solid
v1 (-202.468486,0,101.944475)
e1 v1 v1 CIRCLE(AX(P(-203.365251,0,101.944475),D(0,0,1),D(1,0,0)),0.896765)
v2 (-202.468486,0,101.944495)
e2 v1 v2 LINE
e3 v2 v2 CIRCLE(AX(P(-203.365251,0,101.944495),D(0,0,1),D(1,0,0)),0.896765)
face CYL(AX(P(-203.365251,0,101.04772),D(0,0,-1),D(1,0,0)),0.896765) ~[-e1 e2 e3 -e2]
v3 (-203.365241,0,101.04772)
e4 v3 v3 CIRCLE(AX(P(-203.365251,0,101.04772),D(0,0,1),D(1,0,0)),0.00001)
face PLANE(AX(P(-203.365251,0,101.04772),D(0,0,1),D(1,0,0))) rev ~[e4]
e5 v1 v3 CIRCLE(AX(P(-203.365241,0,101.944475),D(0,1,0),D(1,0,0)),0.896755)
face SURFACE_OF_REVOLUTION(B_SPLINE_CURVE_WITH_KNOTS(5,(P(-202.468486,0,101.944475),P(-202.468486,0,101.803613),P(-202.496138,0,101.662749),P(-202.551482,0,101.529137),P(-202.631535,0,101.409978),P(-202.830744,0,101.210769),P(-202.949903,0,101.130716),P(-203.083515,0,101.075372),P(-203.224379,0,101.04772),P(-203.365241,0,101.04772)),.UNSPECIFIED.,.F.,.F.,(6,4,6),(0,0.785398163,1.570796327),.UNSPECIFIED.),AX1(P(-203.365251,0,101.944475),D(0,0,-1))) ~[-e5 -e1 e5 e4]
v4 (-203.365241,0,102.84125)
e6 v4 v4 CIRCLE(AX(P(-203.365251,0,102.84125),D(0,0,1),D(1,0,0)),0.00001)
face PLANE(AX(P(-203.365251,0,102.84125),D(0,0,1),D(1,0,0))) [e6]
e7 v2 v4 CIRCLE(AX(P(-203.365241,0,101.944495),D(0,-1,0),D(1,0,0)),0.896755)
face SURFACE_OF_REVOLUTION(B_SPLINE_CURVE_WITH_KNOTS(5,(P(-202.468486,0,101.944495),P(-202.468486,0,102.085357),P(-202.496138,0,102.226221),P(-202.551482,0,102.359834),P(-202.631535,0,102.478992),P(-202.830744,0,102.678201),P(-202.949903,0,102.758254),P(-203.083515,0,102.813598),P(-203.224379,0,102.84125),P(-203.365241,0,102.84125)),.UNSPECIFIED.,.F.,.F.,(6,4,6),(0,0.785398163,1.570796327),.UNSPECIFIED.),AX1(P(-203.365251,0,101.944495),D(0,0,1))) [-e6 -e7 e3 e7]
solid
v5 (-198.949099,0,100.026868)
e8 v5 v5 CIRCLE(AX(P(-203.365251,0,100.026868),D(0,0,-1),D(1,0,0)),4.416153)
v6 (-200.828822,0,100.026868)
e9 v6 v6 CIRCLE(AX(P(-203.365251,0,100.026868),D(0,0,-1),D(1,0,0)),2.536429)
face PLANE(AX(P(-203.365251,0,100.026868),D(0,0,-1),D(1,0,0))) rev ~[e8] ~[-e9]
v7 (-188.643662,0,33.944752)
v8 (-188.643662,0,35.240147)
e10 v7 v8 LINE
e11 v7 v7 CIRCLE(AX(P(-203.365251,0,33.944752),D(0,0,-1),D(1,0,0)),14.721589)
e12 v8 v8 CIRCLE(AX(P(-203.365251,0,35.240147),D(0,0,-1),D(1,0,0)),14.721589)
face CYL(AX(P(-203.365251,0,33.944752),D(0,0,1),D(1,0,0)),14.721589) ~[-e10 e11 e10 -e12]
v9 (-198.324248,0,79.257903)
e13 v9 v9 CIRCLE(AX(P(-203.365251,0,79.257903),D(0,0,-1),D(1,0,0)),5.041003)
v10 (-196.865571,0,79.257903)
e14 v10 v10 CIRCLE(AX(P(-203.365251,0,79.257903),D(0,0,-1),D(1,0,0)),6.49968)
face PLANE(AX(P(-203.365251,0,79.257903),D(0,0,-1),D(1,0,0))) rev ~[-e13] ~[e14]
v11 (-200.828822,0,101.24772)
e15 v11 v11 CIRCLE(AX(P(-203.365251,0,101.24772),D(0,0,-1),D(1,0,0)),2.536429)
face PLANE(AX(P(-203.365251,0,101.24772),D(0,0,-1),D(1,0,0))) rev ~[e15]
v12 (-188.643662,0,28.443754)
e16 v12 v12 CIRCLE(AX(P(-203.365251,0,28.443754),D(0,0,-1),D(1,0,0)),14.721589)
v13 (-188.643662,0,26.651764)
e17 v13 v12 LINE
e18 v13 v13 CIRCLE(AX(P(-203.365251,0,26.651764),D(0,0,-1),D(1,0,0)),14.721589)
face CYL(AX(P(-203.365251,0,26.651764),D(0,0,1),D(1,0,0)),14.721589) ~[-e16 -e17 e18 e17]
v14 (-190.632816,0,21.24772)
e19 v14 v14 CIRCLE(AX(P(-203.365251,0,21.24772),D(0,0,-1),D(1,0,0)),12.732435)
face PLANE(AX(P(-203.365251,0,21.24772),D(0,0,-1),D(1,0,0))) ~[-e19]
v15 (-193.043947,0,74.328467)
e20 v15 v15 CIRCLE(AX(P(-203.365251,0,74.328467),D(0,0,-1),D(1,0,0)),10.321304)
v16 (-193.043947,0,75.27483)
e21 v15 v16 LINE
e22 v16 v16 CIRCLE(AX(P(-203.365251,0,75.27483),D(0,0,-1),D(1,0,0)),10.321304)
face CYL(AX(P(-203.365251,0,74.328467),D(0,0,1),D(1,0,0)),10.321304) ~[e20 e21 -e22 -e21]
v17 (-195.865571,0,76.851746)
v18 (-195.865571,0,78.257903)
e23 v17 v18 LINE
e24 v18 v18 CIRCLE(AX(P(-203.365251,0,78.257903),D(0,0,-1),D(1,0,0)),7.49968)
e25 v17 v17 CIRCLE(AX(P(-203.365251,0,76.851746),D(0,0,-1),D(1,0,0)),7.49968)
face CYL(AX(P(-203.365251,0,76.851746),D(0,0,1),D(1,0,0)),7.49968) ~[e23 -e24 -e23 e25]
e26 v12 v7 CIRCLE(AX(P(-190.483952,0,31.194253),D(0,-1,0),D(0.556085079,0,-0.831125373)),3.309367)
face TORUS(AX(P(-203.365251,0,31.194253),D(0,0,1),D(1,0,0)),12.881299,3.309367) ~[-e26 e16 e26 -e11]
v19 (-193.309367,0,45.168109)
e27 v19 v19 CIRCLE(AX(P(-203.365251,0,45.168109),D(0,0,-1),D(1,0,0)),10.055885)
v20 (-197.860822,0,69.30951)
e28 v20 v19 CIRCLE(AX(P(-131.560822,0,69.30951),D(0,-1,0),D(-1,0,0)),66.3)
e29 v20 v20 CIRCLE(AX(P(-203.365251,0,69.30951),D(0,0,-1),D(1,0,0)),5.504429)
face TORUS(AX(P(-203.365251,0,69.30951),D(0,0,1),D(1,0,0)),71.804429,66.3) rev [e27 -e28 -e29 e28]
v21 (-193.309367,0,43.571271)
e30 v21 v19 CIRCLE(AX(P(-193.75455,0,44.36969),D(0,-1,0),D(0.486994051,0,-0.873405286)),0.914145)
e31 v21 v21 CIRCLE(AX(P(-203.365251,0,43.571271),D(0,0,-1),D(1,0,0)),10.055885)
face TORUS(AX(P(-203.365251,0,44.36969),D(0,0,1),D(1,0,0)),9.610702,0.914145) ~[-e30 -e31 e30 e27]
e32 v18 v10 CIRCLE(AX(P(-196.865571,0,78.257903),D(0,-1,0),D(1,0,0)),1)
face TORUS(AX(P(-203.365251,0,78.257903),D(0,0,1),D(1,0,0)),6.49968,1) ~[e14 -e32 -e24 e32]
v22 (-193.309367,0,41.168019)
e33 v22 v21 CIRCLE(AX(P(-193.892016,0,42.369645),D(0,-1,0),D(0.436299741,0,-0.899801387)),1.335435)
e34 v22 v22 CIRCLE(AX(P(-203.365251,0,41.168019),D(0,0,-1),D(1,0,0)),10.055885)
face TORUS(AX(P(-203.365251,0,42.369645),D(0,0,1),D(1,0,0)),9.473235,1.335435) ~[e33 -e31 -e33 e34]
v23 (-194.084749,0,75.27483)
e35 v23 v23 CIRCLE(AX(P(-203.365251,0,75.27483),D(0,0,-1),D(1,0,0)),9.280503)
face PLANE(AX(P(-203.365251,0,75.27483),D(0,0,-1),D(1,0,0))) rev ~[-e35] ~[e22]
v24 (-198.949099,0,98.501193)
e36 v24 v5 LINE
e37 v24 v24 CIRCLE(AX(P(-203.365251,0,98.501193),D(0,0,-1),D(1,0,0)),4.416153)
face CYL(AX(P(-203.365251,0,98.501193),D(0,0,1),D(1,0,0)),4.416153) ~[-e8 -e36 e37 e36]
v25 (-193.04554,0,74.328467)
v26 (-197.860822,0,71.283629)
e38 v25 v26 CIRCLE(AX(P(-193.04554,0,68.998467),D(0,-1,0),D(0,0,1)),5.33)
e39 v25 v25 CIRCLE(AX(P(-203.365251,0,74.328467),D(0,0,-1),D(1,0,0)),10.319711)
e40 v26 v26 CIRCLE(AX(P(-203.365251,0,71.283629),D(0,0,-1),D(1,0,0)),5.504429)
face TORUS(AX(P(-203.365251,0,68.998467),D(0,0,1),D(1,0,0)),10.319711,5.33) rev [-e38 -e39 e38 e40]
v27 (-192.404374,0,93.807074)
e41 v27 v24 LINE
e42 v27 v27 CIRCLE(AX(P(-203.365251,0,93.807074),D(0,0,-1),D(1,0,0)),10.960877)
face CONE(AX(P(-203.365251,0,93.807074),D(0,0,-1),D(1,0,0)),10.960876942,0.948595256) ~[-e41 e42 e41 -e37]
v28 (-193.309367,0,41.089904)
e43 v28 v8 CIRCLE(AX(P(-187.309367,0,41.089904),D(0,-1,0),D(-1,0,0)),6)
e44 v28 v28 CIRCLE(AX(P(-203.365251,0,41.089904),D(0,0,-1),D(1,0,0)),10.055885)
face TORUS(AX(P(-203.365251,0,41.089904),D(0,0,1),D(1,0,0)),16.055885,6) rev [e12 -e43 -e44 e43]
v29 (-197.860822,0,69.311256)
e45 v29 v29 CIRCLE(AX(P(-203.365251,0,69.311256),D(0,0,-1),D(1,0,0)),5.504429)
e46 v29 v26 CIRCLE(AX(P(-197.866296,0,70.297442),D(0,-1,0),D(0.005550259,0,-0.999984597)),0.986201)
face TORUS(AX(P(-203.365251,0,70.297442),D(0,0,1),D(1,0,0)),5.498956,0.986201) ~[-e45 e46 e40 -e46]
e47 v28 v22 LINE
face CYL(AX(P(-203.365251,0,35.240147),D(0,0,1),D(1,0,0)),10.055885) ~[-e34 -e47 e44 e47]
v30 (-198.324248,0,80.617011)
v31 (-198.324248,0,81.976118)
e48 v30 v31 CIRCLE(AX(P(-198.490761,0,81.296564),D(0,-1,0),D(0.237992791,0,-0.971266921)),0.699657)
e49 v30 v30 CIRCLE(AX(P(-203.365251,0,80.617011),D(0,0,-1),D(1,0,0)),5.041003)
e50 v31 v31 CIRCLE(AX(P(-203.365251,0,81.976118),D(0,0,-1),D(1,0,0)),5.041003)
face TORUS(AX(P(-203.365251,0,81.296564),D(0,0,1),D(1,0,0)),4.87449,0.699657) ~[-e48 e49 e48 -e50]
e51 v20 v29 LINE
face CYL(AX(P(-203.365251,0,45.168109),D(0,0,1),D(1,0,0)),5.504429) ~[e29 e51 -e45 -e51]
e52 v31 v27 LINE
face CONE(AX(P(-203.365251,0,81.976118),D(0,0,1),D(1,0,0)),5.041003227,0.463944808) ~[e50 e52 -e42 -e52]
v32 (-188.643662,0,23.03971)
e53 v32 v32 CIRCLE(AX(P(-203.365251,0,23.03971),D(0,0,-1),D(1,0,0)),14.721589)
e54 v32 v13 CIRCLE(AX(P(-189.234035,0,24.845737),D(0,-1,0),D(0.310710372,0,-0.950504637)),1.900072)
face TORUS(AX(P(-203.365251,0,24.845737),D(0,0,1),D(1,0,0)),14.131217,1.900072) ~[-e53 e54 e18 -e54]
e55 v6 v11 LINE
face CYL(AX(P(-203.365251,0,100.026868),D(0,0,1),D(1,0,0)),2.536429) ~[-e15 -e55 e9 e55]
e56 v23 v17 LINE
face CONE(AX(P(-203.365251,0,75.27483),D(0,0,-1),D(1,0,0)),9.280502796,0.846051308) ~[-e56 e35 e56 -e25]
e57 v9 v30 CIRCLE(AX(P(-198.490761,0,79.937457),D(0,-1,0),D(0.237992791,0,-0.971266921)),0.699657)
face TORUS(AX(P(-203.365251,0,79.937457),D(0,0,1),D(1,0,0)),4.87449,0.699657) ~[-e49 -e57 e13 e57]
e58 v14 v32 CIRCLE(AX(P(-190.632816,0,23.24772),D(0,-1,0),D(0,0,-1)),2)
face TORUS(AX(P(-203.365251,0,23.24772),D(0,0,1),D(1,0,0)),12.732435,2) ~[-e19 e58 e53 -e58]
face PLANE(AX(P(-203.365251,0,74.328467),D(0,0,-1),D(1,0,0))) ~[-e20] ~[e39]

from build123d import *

# Parameters (mm, degrees)
F6_R     = 1
F8_R     = 0.896765
F9_DEPTH = 1.79353
F10_R    = 0.896755


# Not quite as in the source:
# - a fillet or chamfer that OpenCascade refuses, or shapes differently, is made with other operations: its cross-section is extruded or revolved along the edge and cut away or added
# - a fillet or chamfer is up to 0.001 mm smaller than in the source, because OpenCascade refuses the exact size


with BuildPart() as f1:
    # F0 (on Front) → F1 (revolve)
    with BuildSketch(Plane.XZ):
        with BuildLine():
            Line((-200.8288223515, 101.2477203459), (-203.3652514219, 101.2477203459))
            Line((-203.3652514219, 101.2477203459), (-203.3652514219, 21.2477203459))
            Line((-203.3652514219, 21.2477203459), (-188.6436624619, 21.2477203459))
            Line((-188.6436624619, 21.2477203459), (-188.6436624619, 23.0397097766))
            ThreePointArc((-188.6436624619, 23.0397097766), (-187.333962533, 24.8457370326), (-188.6436624619, 26.6517642885))
            Line((-188.6436624619, 26.6517642885), (-188.6436624619, 28.4437537193))
            ThreePointArc((-188.6436624619, 28.4437537193), (-187.1745849151, 31.1942528933), (-188.6436624619, 33.9447520673))
            Line((-188.6436624619, 33.9447520673), (-188.6436624619, 35.2401472628))
            Line((-188.6436624619, 35.2401472628), (-193.309366703, 35.2401472628))
            Line((-193.309366703, 35.2401472628), (-193.309366703, 41.1680191755))
            ThreePointArc((-193.309366703, 41.1680191755), (-192.5565818681, 42.3696450889), (-193.309366703, 43.5712710023))
            ThreePointArc((-193.309366703, 43.5712710023), (-192.8404048548, 44.3696901202), (-193.309366703, 45.1681092381))
            Line((-193.309366703, 45.1681092381), (-197.8608220816, 45.1681092381))
            Line((-197.8608220816, 45.1681092381), (-197.8608220816, 69.3112561437))
            ThreePointArc((-197.8608220816, 69.3112561437), (-196.8800943317, 70.2974423766), (-197.8608220816, 71.2836286096))
            Line((-197.8608220816, 71.2836286096), (-197.8608220816, 74.3284672499))
            Line((-197.8608220816, 74.3284672499), (-193.0439472198, 74.3284672499))
            Line((-193.0439472198, 74.3284672499), (-193.0439472198, 75.2748303938))
            Line((-193.0439472198, 75.2748303938), (-194.0847486258, 75.2748303938))
            Line((-194.0847486258, 75.2748303938), (-195.8655714989, 76.8517457771))
            Line((-195.8655714989, 76.8517457771), (-195.8655714989, 79.2579033303))
            Line((-195.8655714989, 79.2579033303), (-198.3242481947, 79.2579033303))
            ThreePointArc((-198.3242481947, 79.2579033303), (-197.7911045704, 79.9374569619), (-198.3242481947, 80.6170105934))
            ThreePointArc((-198.3242481947, 80.6170105934), (-197.7911045704, 81.296564225), (-198.3242481947, 81.9761178565))
            Line((-198.3242481947, 81.9761178565), (-192.4043744802, 93.8070736003))
            Line((-192.4043744802, 93.8070736003), (-198.949098587, 98.5011926961))
            Line((-198.949098587, 98.5011926961), (-198.949098587, 100.0268682092))
            Line((-198.949098587, 100.0268682092), (-200.8288223515, 100.0268682092))
            Line((-200.8288223515, 100.0268682092), (-200.8288223515, 101.2477203459))
        make_face()
    revolve(axis=Axis((-203.3652514219, 0, 61.2477203459), (0, 0, -1)))

    # F2: fillet of radius 2 on 1 edges, made by hand

    # F2_s1 → F2_t2 (revolve, cut)
    with BuildSketch(Plane.XZ):
        with BuildLine():
            ThreePointArc((-190.632815951, 21.2477203459), (-189.2941638562, 21.7617827398), (-188.6436624619, 23.0397097766))
            Line((-188.6436624619, 23.0397097766), (-188.6436624619, 21.2477203459))
            Line((-188.6436624619, 21.2477203459), (-190.632815951, 21.2477203459))
        make_face()
    revolve(axis=Axis((-203.3652514219, 0, 21.2477203459), (0, 0, -1)), mode=Mode.SUBTRACT)

    # F3: fillet of radius 6 on 1 edges, made by hand

    # F3_s1 → F3_t2 (revolve)
    with BuildSketch(Plane.XZ):
        with BuildLine():
            ThreePointArc((-193.309366703, 41.0899040806), (-192.0000902375, 37.3486325423), (-188.6436624619, 35.2401472628))
            Line((-188.6436624619, 35.2401472628), (-188.6703483771, 35.1231521265))
            ThreePointArc((-188.6703483771, 35.1231521265), (-190.9765145825, 35.1201472628), (-193.309366703, 35.1201472628))
            Line((-193.309366703, 35.1201472628), (-193.429366703, 35.2401472628))
            Line((-193.429366703, 35.2401472628), (-193.429366703, 41.0899040806))
            Line((-193.429366703, 41.0899040806), (-193.309366703, 41.0899040806))
        make_face()
    revolve(axis=Axis((-203.3652514219, 0, 35.2401472628), (0, 0, -1)))

    # F4: fillet of radius 66.3 on 1 edges, made by hand

    # F4_s1 → F4_t2 (revolve)
    with BuildSketch(Plane.XZ):
        with BuildLine():
            ThreePointArc((-197.8608220816, 69.3095101323), (-196.7130227674, 57.0261577479), (-193.309366703, 45.1681092381))
            Line((-193.309366703, 45.1681092381), (-194.5443375955, 44.6852812203))
            ThreePointArc((-194.5443375955, 44.6852812203), (-195.5850943923, 43.8421092381), (-197.8608220816, 43.8421092381))
            Line((-197.8608220816, 43.8421092381), (-199.1868220816, 45.1681092381))
            Line((-199.1868220816, 45.1681092381), (-199.1868220816, 69.3095101323))
            Line((-199.1868220816, 69.3095101323), (-197.8608220816, 69.3095101323))
        make_face()
    revolve(axis=Axis((-203.3652514219, 0, 45.1681092381), (0, 0, -1)))

    # F5: fillet of radius 5.33 on 1 edges, made by hand

    # F5_s1 → F5_t2 (revolve)
    with BuildSketch(Plane.XZ):
        with BuildLine():
            ThreePointArc((-193.0455404117, 74.3284672499), (-195.8941356754, 73.5033984395), (-197.8608220816, 71.2836286096))
            Line((-197.8608220816, 71.2836286096), (-197.957127715, 71.3293318368))
            ThreePointArc((-197.957127715, 71.3293318368), (-197.9674220816, 72.8060479297), (-197.9674220816, 74.3284672499))
            Line((-197.9674220816, 74.3284672499), (-197.8608220816, 74.4350672499))
            Line((-197.8608220816, 74.4350672499), (-193.0455404117, 74.4350672499))
            Line((-193.0455404117, 74.4350672499), (-193.0455404117, 74.3284672499))
        make_face()
    revolve(axis=Axis((-203.3652514219, 0, 74.3284672499), (0, 0, -1)))

    # F6
    f6_edges = [f1.edges().sort_by_distance(p)[0] for p in [
        (-210.864931, 0, 79.257903),
    ]]
    fillet(f6_edges, radius=F6_R)


with BuildPart() as f9:
    # F8 (on offset) → F9 (new body)
    with BuildSketch(Plane.XY.offset(101.0477203459)):
        with Locations((-203.3652514219, 0)):
            Circle(F8_R)
    extrude(amount=F9_DEPTH)

    # F10 (radius 0.896765 in the source; OpenCascade refuses exactly that, so slightly less here)
    f10_edges = [f9.edges().sort_by_distance(p)[0] for p in [
        (-204.262016, 0, 102.84125),
        (-204.262016, 0, 101.04772),
    ]]
    fillet(f10_edges, radius=F10_R)


solid = Compound([f1.part, f9.part])
